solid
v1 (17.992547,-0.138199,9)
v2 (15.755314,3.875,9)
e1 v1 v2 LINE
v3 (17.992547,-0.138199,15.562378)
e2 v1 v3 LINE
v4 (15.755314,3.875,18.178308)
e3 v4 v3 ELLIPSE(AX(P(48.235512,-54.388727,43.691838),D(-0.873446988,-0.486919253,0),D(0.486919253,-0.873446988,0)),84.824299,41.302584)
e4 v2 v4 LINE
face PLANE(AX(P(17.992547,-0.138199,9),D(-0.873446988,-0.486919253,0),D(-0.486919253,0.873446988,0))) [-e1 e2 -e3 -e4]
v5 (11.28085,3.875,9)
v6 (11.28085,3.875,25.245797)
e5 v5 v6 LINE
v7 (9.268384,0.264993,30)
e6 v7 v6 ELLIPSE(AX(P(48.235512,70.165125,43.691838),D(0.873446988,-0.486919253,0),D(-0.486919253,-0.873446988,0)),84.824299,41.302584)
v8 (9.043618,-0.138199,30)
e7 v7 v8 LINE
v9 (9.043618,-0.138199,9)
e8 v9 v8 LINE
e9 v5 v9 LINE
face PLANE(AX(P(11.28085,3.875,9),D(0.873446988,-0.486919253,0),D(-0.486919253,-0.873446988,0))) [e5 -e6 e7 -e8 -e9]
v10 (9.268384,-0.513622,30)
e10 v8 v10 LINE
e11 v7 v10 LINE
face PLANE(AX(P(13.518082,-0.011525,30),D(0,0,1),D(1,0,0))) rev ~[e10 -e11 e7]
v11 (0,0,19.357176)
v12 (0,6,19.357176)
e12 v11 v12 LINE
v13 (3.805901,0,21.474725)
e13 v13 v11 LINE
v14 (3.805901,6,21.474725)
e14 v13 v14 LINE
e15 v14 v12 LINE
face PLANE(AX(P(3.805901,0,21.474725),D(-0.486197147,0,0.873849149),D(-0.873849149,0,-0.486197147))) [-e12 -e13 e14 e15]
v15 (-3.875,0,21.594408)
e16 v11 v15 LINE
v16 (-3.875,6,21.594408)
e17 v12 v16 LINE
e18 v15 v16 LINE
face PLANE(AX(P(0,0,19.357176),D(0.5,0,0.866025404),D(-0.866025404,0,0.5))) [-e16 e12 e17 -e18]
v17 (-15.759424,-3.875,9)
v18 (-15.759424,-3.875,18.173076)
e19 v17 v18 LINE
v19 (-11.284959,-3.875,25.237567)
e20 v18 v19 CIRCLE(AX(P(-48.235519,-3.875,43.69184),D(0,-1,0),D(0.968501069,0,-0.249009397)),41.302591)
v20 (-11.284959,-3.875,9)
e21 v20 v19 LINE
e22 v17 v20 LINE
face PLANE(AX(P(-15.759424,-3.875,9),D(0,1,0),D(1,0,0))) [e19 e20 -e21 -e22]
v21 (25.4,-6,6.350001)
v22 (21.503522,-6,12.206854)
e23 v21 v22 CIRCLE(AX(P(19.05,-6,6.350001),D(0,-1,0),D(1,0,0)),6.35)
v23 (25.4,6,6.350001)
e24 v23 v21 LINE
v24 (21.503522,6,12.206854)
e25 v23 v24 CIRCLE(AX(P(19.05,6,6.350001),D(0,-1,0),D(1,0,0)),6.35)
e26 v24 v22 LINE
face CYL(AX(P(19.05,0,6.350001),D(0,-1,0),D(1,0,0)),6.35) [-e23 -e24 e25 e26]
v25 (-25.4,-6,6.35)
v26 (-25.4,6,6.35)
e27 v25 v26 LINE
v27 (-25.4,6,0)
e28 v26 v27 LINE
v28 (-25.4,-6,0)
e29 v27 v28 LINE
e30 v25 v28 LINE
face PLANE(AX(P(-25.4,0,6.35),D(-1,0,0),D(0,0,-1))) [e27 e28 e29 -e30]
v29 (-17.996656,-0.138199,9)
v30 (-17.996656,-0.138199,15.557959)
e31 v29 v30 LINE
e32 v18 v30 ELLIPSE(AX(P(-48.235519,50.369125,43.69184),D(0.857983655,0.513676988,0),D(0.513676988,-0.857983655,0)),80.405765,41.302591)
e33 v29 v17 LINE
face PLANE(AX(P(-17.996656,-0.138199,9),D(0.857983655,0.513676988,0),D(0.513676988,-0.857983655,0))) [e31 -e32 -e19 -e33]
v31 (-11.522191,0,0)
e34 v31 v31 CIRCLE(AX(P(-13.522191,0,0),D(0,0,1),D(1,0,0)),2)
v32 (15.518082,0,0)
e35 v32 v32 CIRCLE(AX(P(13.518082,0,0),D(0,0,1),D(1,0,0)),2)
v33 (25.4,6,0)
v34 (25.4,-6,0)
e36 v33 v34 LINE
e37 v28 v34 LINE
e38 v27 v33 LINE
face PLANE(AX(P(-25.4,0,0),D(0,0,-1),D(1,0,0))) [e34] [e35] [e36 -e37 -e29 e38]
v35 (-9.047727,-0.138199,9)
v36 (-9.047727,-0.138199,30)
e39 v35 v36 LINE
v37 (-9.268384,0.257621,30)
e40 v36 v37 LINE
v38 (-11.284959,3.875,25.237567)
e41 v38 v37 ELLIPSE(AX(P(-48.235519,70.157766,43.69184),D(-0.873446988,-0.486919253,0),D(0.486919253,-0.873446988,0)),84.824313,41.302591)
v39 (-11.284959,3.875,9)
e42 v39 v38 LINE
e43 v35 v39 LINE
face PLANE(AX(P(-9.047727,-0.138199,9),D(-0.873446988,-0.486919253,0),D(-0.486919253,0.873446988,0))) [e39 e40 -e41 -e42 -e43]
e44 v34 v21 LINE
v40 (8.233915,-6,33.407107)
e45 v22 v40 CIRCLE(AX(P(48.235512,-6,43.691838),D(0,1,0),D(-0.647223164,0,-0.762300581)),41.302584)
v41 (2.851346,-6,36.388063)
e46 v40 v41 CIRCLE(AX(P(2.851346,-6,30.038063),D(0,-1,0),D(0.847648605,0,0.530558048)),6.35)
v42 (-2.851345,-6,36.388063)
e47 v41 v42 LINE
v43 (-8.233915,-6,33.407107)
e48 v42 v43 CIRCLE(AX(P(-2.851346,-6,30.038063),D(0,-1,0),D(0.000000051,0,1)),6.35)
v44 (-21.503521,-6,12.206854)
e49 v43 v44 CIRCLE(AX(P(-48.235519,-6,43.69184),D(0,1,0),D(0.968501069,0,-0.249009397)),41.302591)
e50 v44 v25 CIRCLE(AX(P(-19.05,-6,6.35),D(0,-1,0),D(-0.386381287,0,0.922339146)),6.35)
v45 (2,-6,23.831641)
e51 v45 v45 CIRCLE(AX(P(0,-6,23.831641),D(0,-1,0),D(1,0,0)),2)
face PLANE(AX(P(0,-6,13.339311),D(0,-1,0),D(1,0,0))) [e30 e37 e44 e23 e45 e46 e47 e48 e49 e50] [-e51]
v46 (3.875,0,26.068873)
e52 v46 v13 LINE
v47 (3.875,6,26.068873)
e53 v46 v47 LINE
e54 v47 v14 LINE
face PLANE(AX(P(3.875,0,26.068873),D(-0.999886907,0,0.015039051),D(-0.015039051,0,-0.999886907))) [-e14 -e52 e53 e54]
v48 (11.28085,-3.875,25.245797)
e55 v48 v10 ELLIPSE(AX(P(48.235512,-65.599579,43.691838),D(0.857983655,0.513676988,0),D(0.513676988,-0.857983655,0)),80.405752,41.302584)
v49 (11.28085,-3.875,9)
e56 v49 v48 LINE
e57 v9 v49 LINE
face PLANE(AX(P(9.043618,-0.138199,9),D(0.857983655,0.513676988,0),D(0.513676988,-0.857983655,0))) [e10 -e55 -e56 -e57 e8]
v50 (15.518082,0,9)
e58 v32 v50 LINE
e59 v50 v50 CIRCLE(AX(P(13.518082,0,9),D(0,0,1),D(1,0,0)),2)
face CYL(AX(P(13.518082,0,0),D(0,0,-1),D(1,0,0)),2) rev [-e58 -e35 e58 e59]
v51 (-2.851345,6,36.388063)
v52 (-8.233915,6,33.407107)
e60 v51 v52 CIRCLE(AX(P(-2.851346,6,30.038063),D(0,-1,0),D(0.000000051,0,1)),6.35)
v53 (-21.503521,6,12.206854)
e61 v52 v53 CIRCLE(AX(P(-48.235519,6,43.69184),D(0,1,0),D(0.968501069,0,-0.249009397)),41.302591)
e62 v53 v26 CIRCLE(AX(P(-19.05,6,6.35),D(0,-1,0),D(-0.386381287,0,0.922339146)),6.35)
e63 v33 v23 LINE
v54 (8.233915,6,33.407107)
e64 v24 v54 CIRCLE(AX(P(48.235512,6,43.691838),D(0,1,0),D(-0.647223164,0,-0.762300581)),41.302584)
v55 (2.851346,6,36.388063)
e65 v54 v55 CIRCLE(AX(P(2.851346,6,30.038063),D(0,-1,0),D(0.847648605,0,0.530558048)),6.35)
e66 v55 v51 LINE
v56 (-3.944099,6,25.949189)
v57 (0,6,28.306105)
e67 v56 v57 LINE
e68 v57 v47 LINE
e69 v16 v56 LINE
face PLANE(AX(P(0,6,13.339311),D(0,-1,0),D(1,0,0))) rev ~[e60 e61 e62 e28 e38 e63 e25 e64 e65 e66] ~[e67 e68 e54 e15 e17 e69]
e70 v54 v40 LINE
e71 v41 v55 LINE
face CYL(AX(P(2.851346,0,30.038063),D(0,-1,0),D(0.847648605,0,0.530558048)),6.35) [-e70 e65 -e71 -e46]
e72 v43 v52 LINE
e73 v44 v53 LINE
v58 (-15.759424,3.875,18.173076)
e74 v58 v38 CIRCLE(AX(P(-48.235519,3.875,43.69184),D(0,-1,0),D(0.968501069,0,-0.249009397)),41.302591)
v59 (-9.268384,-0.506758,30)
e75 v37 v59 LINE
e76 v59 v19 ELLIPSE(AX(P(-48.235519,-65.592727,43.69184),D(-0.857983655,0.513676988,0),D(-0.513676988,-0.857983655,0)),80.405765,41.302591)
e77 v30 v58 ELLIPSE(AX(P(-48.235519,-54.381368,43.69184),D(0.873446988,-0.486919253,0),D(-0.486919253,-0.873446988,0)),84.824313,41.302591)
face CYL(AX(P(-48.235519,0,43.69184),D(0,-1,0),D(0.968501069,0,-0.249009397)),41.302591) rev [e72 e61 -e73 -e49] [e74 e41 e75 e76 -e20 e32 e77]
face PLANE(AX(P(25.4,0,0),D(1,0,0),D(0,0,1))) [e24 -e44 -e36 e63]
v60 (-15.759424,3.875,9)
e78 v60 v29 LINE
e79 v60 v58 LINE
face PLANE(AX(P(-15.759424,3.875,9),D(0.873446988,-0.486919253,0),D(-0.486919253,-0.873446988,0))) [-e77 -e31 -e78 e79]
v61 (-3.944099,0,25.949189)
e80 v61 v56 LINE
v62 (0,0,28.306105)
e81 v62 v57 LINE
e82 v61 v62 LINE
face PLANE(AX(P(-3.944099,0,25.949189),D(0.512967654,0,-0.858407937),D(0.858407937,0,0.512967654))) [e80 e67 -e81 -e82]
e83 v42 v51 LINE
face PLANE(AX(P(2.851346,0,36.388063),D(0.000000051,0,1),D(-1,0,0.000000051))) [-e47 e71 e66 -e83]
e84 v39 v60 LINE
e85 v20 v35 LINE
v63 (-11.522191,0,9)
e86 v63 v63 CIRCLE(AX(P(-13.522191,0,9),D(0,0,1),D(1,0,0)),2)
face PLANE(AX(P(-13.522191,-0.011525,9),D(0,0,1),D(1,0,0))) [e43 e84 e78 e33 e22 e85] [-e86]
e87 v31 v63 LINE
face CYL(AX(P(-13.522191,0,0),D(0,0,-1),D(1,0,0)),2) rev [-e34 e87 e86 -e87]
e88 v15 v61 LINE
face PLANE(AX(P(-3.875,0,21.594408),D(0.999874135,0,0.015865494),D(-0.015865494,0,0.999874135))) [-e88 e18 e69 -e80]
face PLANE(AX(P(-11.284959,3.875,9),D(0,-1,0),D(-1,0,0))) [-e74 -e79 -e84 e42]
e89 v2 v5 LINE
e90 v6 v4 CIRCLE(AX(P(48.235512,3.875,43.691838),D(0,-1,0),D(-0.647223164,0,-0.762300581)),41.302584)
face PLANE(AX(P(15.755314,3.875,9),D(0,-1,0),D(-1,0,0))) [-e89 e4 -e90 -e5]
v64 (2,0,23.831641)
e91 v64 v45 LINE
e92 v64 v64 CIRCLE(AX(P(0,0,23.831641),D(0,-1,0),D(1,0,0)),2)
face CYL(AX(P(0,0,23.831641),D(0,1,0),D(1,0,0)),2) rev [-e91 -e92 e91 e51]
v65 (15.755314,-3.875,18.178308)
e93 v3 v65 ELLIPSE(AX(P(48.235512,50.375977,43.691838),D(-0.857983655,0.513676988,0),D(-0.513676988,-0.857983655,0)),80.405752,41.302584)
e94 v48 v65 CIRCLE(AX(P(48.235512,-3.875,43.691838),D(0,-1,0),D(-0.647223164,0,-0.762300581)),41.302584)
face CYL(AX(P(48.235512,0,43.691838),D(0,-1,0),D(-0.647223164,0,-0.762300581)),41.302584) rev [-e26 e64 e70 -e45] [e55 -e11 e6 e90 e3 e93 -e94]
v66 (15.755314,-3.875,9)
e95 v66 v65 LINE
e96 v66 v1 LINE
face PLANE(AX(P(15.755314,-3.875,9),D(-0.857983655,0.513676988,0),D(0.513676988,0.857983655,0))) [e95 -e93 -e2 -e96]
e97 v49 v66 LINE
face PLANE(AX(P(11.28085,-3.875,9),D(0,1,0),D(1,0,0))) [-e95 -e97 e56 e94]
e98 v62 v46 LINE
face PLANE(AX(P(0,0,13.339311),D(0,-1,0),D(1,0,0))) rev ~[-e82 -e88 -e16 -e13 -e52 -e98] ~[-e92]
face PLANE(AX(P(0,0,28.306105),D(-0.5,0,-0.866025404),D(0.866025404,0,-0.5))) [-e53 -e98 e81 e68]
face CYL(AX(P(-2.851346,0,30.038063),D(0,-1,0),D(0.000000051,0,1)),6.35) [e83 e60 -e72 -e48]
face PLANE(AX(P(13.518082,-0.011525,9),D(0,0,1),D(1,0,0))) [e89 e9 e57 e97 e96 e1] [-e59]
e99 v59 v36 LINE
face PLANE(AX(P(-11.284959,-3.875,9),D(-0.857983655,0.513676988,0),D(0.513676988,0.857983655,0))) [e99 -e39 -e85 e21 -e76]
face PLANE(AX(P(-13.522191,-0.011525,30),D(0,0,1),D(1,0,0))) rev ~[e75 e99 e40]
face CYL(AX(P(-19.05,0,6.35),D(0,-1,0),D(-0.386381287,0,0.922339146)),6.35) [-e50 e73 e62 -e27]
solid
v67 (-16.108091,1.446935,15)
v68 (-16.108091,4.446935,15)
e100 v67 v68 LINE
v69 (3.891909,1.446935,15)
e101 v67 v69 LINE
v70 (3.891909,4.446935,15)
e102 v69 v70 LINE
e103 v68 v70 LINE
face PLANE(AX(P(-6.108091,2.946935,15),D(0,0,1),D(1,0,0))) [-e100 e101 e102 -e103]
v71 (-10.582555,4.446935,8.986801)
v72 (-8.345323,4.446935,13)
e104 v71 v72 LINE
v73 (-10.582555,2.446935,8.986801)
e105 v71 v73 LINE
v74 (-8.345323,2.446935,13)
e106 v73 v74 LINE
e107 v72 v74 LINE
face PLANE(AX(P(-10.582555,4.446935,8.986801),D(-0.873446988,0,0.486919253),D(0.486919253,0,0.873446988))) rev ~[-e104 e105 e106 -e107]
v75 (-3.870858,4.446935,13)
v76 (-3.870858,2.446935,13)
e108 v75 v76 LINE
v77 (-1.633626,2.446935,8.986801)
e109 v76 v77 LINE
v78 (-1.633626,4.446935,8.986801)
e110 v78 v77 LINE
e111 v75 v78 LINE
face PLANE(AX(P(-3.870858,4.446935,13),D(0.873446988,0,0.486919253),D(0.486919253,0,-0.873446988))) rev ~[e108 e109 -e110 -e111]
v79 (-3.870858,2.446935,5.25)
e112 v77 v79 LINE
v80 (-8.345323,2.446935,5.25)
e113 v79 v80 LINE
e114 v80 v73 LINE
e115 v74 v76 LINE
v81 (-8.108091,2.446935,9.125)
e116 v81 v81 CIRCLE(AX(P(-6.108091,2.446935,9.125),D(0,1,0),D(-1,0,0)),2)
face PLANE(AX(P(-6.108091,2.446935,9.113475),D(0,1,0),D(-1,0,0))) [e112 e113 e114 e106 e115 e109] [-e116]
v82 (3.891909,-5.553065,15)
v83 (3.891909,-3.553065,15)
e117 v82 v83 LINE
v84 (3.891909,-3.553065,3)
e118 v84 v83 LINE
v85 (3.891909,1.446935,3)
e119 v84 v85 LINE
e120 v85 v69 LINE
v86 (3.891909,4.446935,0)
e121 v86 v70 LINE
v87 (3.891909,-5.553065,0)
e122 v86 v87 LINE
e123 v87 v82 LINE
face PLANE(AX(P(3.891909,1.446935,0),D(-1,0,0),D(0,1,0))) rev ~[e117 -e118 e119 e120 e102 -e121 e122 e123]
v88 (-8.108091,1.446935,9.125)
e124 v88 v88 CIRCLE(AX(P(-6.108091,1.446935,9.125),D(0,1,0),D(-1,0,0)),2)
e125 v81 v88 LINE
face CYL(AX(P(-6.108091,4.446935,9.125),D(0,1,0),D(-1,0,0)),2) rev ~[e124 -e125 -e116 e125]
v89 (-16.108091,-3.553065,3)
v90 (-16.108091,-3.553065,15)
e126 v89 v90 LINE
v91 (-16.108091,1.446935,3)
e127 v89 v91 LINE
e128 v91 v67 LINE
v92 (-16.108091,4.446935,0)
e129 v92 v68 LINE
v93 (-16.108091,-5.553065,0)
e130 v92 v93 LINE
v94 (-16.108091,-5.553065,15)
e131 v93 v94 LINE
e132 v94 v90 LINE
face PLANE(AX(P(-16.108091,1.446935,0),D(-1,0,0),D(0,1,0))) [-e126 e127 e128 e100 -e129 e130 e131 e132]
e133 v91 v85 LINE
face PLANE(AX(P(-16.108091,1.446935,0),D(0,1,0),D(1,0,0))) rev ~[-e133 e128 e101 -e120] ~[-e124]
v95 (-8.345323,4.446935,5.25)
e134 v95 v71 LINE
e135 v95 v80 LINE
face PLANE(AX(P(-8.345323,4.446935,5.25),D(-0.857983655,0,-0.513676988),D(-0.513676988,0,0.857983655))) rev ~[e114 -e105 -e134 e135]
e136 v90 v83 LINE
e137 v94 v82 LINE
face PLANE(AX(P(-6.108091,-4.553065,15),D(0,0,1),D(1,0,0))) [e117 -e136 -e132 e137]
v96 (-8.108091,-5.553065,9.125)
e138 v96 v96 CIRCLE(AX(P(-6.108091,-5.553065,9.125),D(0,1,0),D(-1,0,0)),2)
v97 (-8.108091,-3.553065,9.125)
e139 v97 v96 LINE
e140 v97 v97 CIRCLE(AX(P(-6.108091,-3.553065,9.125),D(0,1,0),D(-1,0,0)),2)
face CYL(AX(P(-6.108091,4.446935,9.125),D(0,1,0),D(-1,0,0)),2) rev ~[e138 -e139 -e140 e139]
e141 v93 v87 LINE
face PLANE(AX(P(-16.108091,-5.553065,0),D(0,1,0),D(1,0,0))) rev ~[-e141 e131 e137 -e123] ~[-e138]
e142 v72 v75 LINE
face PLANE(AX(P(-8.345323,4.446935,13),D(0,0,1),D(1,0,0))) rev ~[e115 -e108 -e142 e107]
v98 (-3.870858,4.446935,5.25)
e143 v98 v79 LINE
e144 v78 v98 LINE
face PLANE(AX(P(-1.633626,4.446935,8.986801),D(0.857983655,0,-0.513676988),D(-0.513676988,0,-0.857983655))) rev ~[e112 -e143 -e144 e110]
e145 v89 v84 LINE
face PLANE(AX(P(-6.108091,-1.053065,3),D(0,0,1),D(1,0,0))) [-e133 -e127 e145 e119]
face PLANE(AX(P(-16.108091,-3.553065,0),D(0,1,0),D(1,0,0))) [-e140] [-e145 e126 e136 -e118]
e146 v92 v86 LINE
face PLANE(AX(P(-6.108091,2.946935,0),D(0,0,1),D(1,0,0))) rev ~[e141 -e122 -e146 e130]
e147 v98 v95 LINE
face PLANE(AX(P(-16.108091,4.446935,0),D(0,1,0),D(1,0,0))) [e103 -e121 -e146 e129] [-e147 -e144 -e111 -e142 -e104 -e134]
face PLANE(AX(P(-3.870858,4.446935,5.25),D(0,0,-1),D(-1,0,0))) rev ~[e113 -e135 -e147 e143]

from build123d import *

# Parameters (mm, degrees)
F0_W      = 20
F0_H      = 5
F1_DEPTH  = 3
F0_H_2    = 3
F0_H_3    = 2
F2_DEPTH  = 15
F3_R      = 2
F4_DEPTH  = 2
F5_DEPTH  = 25.4
F6_R      = 2
F7_DEPTH  = 6
F8_DEPTH  = 6
F9_R      = 2
F10_DEPTH = 25.4
F11_START = 9
F11_DEPTH = 21


with BuildPart() as f1:
    # F0 (on Top) → F1 (new body)
    with BuildSketch(Plane.XY):
        with Locations((-6.108090542, -1.053064514)):
            Rectangle(F0_W, F0_H)
    extrude(amount=F1_DEPTH)

    # F0 (on Top) → F2 (join)
    with BuildSketch(Plane.XY):
        with Locations((-6.108090542, 2.946935486)):
            Rectangle(F0_W, F0_H_2)
        with Locations((-6.108090542, -4.553064514)):
            Rectangle(F0_W, F0_H_3)
    extrude(amount=F2_DEPTH)

    # F3 (on face) → F4 (cut)
    with BuildSketch(Plane(origin=(0, 4.446935486, 0), x_dir=(-1, 0, 0), z_dir=(0, 1, 0))):
        Polygon((10.5825551282, 8.9868011065), (8.3453228351, 13), (3.8708582489, 13), (1.6336259557, 8.9868011065), (3.8708582489, 5.25), (8.3453228351, 5.25), align=None)
        with Locations((6.108090542, 9.125)):
            Circle(F3_R, mode=Mode.SUBTRACT)
    extrude(amount=-F4_DEPTH, mode=Mode.SUBTRACT)

    # F5 (cut): a face of the model
    f5_faces = [f1.faces().sort_by_distance(p)[0] for p in [
        (-6.108090542, 4.446935486, 9.125),
    ]]
    extrude(f5_faces, amount=-F5_DEPTH, mode=Mode.SUBTRACT)


with BuildPart() as f7:
    # F6 (on Front) → F7 (new body)
    with BuildSketch(Plane.XZ):
        with BuildLine():
            Line((-25.4, 6.35), (-25.4, 0))
            Line((-25.4, 0), (25.4, 0))
            Line((25.4, 0), (25.4, 6.3500013265))
            ThreePointArc((25.4, 6.3500013265), (24.3368879233, 9.8672894988), (21.5035224923, 12.2068543535))
            ThreePointArc((21.5035224923, 12.2068543535), (13.2254338027, 21.7784198761), (8.233914751, 33.4071066662))
            ThreePointArc((8.233914751, 33.4071066662), (5.9277949415, 35.5930574418), (2.8513464312, 36.3880630597))
            Line((2.8513464312, 36.3880630597), (-2.8513454918, 36.3880633483))
            ThreePointArc((-2.8513454918, 36.3880633483), (-5.9277945127, 35.5930578036), (-8.233914635, 33.4071066662))
            ThreePointArc((-8.233914635, 33.4071066662), (-13.2254333146, 21.7784197643), (-21.5035211719, 12.2068535801))
            ThreePointArc((-21.5035211719, 12.2068535801), (-24.3368875268, 9.8672887683), (-25.4, 6.35))
        make_face()
        Polygon((0, 28.3061052624), (3.875, 26.0688729693), (3.8059005532, 21.4747246305), (0, 19.3571760899), (-3.875, 21.594408383), (-3.9440994468, 25.9491892167), align=None, mode=Mode.SUBTRACT)
        Polygon((3.8059005532, 21.4747246305), (3.875, 26.0688729693), (0, 28.3061052624), (-3.9440994468, 25.9491892167), (-3.875, 21.594408383), (0, 19.3571760899), align=None)
        with Locations((0, 23.8316406762)):
            Circle(F6_R, mode=Mode.SUBTRACT)
    extrude(amount=F7_DEPTH)

    # F6 (on Front) → F8 (join)
    with BuildSketch(Plane.XZ):
        with BuildLine():
            Line((-25.4, 6.35), (-25.4, 0))
            Line((-25.4, 0), (25.4, 0))
            Line((25.4, 0), (25.4, 6.3500013265))
            ThreePointArc((25.4, 6.3500013265), (24.3368879233, 9.8672894988), (21.5035224923, 12.2068543535))
            ThreePointArc((21.5035224923, 12.2068543535), (13.2254338027, 21.7784198761), (8.233914751, 33.4071066662))
            ThreePointArc((8.233914751, 33.4071066662), (5.9277949415, 35.5930574418), (2.8513464312, 36.3880630597))
            Line((2.8513464312, 36.3880630597), (-2.8513454918, 36.3880633483))
            ThreePointArc((-2.8513454918, 36.3880633483), (-5.9277945127, 35.5930578036), (-8.233914635, 33.4071066662))
            ThreePointArc((-8.233914635, 33.4071066662), (-13.2254333146, 21.7784197643), (-21.5035211719, 12.2068535801))
            ThreePointArc((-21.5035211719, 12.2068535801), (-24.3368875268, 9.8672887683), (-25.4, 6.35))
        make_face()
        Polygon((0, 28.3061052624), (3.875, 26.0688729693), (3.8059005532, 21.4747246305), (0, 19.3571760899), (-3.875, 21.594408383), (-3.9440994468, 25.9491892167), align=None, mode=Mode.SUBTRACT)
    extrude(amount=-F8_DEPTH)

    # F9 (on Top) → F10 (cut)
    with BuildSketch(Plane.XY):
        with Locations((-13.5221913382, 0)):
            Circle(F9_R)
        with Locations((13.5180821443, 0)):
            Circle(F9_R)
    extrude(amount=F10_DEPTH, mode=Mode.SUBTRACT)

    # F9 (on Top) → F11 (cut)
    with BuildSketch(Plane.XY.offset(F11_START)):
        Polygon((-9.047726752, -0.1381988935), (-11.2849590451, 3.875), (-15.7594236313, 3.875), (-17.9966559245, -0.1381988935), (-15.7594236313, -3.875), (-11.2849590451, -3.875), align=None)
        with Locations((-13.5221913382, 0)):
            Circle(F9_R, mode=Mode.SUBTRACT)
        Polygon((17.9925467305, -0.1381988935), (15.7553144374, 3.875), (11.2808498512, 3.875), (9.0436175581, -0.1381988935), (11.2808498512, -3.875), (15.7553144374, -3.875), align=None)
        with Locations((13.5180821443, 0)):
            Circle(F9_R, mode=Mode.SUBTRACT)
    extrude(amount=F11_DEPTH, mode=Mode.SUBTRACT)


solid = Compound([f1.part, f7.part])
